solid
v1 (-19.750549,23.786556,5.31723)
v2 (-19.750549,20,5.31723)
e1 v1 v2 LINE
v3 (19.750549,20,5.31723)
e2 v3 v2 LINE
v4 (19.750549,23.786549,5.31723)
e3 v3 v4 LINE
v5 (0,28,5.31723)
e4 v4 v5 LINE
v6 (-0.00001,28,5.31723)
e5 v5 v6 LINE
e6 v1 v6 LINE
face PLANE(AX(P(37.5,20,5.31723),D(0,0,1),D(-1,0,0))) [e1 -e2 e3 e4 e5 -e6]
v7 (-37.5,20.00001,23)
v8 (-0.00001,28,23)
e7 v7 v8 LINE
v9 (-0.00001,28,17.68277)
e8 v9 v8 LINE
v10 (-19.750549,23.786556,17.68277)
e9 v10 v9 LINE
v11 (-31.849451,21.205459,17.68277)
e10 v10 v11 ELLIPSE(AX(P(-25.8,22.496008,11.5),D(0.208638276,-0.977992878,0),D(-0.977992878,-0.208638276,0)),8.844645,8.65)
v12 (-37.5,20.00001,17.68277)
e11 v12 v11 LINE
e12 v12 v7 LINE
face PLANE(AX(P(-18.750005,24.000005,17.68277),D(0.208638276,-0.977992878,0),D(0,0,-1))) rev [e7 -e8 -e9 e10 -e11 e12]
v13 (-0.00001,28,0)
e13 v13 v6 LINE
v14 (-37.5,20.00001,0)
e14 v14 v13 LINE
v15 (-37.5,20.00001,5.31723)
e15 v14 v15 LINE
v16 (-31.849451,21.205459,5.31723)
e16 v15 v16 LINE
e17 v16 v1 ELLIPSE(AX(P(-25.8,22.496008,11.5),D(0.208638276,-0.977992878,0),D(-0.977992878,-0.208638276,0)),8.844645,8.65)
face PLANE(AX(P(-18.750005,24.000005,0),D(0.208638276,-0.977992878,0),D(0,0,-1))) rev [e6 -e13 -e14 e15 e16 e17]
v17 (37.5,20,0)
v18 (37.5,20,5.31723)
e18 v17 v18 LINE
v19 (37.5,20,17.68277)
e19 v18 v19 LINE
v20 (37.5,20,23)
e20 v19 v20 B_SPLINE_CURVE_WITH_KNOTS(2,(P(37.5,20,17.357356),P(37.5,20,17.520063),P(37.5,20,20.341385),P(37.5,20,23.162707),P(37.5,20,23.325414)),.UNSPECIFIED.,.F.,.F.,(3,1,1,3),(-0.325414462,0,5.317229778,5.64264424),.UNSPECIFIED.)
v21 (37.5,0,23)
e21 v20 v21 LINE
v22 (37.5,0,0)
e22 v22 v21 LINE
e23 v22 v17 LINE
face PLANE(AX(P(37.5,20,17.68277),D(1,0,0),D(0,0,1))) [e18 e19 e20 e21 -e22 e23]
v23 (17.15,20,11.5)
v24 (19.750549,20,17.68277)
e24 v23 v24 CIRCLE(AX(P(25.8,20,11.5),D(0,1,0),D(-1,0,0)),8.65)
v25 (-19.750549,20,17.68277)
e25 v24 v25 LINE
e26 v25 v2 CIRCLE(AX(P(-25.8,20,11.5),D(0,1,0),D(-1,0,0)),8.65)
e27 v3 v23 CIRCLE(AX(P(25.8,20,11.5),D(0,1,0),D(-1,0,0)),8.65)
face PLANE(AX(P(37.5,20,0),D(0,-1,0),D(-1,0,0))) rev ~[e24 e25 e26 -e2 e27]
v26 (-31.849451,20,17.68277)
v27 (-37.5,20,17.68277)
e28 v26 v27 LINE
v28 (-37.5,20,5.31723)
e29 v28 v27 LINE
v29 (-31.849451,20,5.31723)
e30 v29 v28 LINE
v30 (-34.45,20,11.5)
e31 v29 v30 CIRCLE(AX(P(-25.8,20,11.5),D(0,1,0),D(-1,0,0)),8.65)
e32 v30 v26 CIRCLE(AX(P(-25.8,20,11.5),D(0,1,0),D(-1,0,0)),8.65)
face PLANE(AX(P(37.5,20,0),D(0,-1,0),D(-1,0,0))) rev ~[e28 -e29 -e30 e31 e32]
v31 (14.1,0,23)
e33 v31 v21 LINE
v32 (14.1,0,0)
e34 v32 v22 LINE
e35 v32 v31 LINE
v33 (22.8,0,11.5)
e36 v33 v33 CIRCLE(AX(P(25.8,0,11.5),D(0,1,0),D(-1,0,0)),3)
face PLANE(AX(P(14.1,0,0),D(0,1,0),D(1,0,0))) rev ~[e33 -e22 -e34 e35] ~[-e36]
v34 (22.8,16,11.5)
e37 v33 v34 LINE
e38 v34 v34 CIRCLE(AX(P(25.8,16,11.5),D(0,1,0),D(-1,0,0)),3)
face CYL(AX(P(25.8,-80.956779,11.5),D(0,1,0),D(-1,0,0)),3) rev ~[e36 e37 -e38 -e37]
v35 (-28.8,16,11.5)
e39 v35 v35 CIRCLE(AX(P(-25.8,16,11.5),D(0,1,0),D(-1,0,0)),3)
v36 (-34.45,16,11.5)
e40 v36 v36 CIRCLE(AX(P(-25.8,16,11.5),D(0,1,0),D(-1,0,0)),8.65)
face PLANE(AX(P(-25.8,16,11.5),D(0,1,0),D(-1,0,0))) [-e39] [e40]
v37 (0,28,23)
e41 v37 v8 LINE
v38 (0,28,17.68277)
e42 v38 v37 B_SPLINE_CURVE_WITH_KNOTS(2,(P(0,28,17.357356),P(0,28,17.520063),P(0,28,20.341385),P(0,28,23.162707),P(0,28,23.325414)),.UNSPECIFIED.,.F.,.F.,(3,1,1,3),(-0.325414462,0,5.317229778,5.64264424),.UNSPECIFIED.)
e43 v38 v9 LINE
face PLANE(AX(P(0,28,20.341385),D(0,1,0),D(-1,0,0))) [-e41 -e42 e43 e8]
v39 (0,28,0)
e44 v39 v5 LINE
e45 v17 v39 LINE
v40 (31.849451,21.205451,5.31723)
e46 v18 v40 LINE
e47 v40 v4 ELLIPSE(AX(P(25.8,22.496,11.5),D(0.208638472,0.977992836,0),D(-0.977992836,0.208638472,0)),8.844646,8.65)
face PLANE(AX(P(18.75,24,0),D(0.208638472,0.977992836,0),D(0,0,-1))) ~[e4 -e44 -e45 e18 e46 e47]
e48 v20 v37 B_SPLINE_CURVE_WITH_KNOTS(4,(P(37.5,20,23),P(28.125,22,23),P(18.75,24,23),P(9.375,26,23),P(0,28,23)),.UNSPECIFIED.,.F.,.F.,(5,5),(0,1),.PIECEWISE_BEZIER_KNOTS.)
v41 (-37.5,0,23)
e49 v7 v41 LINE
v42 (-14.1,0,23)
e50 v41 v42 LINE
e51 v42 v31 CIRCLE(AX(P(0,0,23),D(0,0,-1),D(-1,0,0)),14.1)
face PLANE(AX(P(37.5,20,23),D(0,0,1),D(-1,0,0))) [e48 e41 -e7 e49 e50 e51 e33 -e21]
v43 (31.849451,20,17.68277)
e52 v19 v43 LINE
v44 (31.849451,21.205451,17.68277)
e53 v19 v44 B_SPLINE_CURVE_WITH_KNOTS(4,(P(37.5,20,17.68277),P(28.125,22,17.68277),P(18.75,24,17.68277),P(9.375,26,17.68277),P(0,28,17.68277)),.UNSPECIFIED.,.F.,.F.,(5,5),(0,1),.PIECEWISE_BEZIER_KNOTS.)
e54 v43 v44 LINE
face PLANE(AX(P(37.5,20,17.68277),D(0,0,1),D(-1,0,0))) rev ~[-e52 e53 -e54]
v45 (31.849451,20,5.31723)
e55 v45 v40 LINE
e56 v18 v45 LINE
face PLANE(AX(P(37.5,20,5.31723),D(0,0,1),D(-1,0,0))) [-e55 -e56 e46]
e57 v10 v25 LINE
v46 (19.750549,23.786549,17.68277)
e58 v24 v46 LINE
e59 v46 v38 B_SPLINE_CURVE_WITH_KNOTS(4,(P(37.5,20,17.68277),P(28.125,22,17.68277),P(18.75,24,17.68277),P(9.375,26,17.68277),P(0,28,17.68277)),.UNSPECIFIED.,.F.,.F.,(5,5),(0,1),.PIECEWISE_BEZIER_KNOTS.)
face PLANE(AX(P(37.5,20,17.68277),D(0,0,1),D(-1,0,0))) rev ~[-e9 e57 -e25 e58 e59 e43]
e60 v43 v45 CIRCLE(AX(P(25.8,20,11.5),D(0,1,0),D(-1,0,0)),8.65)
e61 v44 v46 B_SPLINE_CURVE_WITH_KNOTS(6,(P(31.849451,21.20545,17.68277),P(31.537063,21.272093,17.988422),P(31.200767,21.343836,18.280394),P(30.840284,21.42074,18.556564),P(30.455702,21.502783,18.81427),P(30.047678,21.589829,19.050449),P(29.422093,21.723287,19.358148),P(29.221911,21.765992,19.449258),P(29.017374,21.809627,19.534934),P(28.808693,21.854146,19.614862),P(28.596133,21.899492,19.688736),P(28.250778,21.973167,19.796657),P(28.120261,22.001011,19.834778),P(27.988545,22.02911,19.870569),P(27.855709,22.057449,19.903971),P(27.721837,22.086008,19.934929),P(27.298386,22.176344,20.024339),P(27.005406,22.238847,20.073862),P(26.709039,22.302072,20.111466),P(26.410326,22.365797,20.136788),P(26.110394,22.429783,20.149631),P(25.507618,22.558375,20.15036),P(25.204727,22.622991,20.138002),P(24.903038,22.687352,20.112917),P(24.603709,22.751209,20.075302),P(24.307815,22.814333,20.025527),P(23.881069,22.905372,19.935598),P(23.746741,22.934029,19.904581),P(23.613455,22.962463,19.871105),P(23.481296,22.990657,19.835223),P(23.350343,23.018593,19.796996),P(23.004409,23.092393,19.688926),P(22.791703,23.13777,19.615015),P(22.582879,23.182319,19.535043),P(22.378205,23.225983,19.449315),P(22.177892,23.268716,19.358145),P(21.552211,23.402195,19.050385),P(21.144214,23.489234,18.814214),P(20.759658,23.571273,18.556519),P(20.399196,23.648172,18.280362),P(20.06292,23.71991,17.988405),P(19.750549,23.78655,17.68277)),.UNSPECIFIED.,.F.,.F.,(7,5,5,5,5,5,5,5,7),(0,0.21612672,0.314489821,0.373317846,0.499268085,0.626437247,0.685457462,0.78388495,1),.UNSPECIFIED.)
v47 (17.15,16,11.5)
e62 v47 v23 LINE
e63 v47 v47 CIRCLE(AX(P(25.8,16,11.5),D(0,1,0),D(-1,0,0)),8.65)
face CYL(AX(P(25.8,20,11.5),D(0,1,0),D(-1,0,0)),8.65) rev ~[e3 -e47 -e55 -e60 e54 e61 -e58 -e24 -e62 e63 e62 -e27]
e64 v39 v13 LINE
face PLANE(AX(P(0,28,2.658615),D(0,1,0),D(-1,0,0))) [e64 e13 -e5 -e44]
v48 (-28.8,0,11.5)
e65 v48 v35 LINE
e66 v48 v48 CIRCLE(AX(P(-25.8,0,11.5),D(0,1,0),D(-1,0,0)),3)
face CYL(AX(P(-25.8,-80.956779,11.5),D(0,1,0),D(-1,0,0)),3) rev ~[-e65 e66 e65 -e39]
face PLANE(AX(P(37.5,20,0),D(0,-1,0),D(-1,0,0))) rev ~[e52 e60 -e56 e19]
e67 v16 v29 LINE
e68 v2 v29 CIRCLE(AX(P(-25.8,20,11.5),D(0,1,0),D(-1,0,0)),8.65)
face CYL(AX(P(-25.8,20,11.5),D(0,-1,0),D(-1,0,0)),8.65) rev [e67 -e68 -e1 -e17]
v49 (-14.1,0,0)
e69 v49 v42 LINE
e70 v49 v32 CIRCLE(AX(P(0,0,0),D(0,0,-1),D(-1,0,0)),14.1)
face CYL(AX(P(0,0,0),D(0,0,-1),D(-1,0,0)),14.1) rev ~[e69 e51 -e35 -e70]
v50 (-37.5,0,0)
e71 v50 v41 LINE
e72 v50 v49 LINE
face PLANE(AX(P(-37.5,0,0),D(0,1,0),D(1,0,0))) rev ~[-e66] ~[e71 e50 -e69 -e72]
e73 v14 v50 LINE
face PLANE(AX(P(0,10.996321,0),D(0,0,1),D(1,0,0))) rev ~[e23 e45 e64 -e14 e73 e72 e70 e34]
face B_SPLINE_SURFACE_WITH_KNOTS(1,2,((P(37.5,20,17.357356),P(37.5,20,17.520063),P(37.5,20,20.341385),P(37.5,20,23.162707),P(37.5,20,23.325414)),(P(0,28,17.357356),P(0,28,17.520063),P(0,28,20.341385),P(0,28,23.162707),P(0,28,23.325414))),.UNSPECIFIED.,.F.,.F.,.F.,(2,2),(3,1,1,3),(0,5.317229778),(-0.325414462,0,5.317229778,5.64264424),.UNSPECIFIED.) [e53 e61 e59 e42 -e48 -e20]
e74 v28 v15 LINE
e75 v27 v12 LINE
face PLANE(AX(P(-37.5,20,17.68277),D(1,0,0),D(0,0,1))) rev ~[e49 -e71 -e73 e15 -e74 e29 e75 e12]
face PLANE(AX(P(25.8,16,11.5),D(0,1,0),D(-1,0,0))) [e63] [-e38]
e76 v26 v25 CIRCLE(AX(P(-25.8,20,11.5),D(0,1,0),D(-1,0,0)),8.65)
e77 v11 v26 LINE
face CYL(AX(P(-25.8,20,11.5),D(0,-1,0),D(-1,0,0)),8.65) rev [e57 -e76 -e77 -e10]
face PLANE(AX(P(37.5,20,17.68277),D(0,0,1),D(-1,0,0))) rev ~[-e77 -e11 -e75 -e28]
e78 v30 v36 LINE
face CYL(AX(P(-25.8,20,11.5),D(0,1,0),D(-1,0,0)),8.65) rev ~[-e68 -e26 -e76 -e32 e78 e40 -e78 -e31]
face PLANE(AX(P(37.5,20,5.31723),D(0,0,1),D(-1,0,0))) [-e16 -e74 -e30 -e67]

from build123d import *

# Parameters (mm, degrees)
F1_DEPTH  = 23
F4_D      = 6
F5_D      = 6
F6_W      = 75
F6_H      = 5.3172297776
F7_DEPTH  = 8
F8_SIZE2  = 37.5
F8_SIZE   = 8
F9_SIZE2  = 37.5
F9_SIZE   = 8
F10_SIZE2 = 37.49999
F10_SIZE  = 7.99999
F11_SIZE2 = 37.49999
F11_SIZE  = 7.99999
F12_R     = 8.65
F13_DEPTH = 4


# Not quite as in the source:
# - a fillet or chamfer is up to 0.001 mm smaller than in the source, because OpenCascade refuses the exact size


with BuildPart() as f1:
    # F0 (on Top) → F1 (new body)
    with BuildSketch(Plane.XY):
        with BuildLine():
            Line((37.5, 20), (-37.5, 20))
            Line((-37.5, 20), (-37.5, 0))
            Line((-37.5, 0), (-14.1, 0))
            ThreePointArc((-14.1, 0), (0, 14.1), (14.1, 0))
            Line((14.1, 0), (37.5, 0))
            Line((37.5, 0), (37.5, 20))
        make_face()
    extrude(amount=F1_DEPTH)

    # F4 (through all)
    with Locations(Plane.XZ):
        with Locations((-25.8, 11.5)):
            Hole(F4_D / 2)

    # F5 (through all)
    with Locations(Plane.XZ):
        with Locations((25.8, 11.5)):
            Hole(F5_D / 2)

    # F6 (on face) → F7 (join)
    with BuildSketch(Plane(origin=(0, 20, 0), x_dir=(-1, 0, 0), z_dir=(0, 1, 0))):
        with Locations((0, 20.3413851112)):
            Rectangle(F6_W, F6_H)
        with Locations((0, 2.6586148888)):
            Rectangle(F6_W, F6_H)
    extrude(amount=F7_DEPTH)

    # F8
    f8_edges = [f1.edges().sort_by_distance(p)[0] for p in [
        (37.5, 28, 2.658615),
    ]]
    f8_side = f1.faces().sort_by_distance((37.5, 12.185127, 11.5))[0]
    chamfer(f8_edges, length=F8_SIZE, length2=F8_SIZE2, reference=f8_side)

    # F9
    f9_edges = [f1.edges().sort_by_distance(p)[0] for p in [
        (37.5, 28, 20.341385),
    ]]
    f9_side = f1.faces().sort_by_distance((37.5, 11.185045, 12.248388))[0]
    chamfer(f9_edges, length=F9_SIZE, length2=F9_SIZE2, reference=f9_side)

    # F10 (size 8 and 37.5 in the source; OpenCascade refuses exactly that, so slightly less here)
    f10_edges = [f1.edges().sort_by_distance(p)[0] for p in [
        (-37.5, 28, 20.341385),
    ]]
    f10_side = f1.faces().sort_by_distance((-37.5, 12.185127, 11.5))[0]
    chamfer(f10_edges, length=F10_SIZE, length2=F10_SIZE2, reference=f10_side)

    # F11 (size 8 and 37.5 in the source; OpenCascade refuses exactly that, so slightly less here)
    f11_edges = [f1.edges().sort_by_distance(p)[0] for p in [
        (-37.5, 28, 2.658615),
    ]]
    f11_side = f1.faces().sort_by_distance((-37.5, 11.185046, 10.751613))[0]
    chamfer(f11_edges, length=F11_SIZE, length2=F11_SIZE2, reference=f11_side)

    # F12 (on face) → F13 (cut, symmetric)
    with BuildSketch(Plane(origin=(0, 20, 0), x_dir=(-1, 0, 0), z_dir=(0, 1, 0))):
        with Locations((25.8, 11.5)):
            Circle(F12_R)
        with Locations((-25.8, 11.5)):
            Circle(F12_R)
    extrude(amount=F13_DEPTH, both=True, mode=Mode.SUBTRACT)


solid = f1.part
